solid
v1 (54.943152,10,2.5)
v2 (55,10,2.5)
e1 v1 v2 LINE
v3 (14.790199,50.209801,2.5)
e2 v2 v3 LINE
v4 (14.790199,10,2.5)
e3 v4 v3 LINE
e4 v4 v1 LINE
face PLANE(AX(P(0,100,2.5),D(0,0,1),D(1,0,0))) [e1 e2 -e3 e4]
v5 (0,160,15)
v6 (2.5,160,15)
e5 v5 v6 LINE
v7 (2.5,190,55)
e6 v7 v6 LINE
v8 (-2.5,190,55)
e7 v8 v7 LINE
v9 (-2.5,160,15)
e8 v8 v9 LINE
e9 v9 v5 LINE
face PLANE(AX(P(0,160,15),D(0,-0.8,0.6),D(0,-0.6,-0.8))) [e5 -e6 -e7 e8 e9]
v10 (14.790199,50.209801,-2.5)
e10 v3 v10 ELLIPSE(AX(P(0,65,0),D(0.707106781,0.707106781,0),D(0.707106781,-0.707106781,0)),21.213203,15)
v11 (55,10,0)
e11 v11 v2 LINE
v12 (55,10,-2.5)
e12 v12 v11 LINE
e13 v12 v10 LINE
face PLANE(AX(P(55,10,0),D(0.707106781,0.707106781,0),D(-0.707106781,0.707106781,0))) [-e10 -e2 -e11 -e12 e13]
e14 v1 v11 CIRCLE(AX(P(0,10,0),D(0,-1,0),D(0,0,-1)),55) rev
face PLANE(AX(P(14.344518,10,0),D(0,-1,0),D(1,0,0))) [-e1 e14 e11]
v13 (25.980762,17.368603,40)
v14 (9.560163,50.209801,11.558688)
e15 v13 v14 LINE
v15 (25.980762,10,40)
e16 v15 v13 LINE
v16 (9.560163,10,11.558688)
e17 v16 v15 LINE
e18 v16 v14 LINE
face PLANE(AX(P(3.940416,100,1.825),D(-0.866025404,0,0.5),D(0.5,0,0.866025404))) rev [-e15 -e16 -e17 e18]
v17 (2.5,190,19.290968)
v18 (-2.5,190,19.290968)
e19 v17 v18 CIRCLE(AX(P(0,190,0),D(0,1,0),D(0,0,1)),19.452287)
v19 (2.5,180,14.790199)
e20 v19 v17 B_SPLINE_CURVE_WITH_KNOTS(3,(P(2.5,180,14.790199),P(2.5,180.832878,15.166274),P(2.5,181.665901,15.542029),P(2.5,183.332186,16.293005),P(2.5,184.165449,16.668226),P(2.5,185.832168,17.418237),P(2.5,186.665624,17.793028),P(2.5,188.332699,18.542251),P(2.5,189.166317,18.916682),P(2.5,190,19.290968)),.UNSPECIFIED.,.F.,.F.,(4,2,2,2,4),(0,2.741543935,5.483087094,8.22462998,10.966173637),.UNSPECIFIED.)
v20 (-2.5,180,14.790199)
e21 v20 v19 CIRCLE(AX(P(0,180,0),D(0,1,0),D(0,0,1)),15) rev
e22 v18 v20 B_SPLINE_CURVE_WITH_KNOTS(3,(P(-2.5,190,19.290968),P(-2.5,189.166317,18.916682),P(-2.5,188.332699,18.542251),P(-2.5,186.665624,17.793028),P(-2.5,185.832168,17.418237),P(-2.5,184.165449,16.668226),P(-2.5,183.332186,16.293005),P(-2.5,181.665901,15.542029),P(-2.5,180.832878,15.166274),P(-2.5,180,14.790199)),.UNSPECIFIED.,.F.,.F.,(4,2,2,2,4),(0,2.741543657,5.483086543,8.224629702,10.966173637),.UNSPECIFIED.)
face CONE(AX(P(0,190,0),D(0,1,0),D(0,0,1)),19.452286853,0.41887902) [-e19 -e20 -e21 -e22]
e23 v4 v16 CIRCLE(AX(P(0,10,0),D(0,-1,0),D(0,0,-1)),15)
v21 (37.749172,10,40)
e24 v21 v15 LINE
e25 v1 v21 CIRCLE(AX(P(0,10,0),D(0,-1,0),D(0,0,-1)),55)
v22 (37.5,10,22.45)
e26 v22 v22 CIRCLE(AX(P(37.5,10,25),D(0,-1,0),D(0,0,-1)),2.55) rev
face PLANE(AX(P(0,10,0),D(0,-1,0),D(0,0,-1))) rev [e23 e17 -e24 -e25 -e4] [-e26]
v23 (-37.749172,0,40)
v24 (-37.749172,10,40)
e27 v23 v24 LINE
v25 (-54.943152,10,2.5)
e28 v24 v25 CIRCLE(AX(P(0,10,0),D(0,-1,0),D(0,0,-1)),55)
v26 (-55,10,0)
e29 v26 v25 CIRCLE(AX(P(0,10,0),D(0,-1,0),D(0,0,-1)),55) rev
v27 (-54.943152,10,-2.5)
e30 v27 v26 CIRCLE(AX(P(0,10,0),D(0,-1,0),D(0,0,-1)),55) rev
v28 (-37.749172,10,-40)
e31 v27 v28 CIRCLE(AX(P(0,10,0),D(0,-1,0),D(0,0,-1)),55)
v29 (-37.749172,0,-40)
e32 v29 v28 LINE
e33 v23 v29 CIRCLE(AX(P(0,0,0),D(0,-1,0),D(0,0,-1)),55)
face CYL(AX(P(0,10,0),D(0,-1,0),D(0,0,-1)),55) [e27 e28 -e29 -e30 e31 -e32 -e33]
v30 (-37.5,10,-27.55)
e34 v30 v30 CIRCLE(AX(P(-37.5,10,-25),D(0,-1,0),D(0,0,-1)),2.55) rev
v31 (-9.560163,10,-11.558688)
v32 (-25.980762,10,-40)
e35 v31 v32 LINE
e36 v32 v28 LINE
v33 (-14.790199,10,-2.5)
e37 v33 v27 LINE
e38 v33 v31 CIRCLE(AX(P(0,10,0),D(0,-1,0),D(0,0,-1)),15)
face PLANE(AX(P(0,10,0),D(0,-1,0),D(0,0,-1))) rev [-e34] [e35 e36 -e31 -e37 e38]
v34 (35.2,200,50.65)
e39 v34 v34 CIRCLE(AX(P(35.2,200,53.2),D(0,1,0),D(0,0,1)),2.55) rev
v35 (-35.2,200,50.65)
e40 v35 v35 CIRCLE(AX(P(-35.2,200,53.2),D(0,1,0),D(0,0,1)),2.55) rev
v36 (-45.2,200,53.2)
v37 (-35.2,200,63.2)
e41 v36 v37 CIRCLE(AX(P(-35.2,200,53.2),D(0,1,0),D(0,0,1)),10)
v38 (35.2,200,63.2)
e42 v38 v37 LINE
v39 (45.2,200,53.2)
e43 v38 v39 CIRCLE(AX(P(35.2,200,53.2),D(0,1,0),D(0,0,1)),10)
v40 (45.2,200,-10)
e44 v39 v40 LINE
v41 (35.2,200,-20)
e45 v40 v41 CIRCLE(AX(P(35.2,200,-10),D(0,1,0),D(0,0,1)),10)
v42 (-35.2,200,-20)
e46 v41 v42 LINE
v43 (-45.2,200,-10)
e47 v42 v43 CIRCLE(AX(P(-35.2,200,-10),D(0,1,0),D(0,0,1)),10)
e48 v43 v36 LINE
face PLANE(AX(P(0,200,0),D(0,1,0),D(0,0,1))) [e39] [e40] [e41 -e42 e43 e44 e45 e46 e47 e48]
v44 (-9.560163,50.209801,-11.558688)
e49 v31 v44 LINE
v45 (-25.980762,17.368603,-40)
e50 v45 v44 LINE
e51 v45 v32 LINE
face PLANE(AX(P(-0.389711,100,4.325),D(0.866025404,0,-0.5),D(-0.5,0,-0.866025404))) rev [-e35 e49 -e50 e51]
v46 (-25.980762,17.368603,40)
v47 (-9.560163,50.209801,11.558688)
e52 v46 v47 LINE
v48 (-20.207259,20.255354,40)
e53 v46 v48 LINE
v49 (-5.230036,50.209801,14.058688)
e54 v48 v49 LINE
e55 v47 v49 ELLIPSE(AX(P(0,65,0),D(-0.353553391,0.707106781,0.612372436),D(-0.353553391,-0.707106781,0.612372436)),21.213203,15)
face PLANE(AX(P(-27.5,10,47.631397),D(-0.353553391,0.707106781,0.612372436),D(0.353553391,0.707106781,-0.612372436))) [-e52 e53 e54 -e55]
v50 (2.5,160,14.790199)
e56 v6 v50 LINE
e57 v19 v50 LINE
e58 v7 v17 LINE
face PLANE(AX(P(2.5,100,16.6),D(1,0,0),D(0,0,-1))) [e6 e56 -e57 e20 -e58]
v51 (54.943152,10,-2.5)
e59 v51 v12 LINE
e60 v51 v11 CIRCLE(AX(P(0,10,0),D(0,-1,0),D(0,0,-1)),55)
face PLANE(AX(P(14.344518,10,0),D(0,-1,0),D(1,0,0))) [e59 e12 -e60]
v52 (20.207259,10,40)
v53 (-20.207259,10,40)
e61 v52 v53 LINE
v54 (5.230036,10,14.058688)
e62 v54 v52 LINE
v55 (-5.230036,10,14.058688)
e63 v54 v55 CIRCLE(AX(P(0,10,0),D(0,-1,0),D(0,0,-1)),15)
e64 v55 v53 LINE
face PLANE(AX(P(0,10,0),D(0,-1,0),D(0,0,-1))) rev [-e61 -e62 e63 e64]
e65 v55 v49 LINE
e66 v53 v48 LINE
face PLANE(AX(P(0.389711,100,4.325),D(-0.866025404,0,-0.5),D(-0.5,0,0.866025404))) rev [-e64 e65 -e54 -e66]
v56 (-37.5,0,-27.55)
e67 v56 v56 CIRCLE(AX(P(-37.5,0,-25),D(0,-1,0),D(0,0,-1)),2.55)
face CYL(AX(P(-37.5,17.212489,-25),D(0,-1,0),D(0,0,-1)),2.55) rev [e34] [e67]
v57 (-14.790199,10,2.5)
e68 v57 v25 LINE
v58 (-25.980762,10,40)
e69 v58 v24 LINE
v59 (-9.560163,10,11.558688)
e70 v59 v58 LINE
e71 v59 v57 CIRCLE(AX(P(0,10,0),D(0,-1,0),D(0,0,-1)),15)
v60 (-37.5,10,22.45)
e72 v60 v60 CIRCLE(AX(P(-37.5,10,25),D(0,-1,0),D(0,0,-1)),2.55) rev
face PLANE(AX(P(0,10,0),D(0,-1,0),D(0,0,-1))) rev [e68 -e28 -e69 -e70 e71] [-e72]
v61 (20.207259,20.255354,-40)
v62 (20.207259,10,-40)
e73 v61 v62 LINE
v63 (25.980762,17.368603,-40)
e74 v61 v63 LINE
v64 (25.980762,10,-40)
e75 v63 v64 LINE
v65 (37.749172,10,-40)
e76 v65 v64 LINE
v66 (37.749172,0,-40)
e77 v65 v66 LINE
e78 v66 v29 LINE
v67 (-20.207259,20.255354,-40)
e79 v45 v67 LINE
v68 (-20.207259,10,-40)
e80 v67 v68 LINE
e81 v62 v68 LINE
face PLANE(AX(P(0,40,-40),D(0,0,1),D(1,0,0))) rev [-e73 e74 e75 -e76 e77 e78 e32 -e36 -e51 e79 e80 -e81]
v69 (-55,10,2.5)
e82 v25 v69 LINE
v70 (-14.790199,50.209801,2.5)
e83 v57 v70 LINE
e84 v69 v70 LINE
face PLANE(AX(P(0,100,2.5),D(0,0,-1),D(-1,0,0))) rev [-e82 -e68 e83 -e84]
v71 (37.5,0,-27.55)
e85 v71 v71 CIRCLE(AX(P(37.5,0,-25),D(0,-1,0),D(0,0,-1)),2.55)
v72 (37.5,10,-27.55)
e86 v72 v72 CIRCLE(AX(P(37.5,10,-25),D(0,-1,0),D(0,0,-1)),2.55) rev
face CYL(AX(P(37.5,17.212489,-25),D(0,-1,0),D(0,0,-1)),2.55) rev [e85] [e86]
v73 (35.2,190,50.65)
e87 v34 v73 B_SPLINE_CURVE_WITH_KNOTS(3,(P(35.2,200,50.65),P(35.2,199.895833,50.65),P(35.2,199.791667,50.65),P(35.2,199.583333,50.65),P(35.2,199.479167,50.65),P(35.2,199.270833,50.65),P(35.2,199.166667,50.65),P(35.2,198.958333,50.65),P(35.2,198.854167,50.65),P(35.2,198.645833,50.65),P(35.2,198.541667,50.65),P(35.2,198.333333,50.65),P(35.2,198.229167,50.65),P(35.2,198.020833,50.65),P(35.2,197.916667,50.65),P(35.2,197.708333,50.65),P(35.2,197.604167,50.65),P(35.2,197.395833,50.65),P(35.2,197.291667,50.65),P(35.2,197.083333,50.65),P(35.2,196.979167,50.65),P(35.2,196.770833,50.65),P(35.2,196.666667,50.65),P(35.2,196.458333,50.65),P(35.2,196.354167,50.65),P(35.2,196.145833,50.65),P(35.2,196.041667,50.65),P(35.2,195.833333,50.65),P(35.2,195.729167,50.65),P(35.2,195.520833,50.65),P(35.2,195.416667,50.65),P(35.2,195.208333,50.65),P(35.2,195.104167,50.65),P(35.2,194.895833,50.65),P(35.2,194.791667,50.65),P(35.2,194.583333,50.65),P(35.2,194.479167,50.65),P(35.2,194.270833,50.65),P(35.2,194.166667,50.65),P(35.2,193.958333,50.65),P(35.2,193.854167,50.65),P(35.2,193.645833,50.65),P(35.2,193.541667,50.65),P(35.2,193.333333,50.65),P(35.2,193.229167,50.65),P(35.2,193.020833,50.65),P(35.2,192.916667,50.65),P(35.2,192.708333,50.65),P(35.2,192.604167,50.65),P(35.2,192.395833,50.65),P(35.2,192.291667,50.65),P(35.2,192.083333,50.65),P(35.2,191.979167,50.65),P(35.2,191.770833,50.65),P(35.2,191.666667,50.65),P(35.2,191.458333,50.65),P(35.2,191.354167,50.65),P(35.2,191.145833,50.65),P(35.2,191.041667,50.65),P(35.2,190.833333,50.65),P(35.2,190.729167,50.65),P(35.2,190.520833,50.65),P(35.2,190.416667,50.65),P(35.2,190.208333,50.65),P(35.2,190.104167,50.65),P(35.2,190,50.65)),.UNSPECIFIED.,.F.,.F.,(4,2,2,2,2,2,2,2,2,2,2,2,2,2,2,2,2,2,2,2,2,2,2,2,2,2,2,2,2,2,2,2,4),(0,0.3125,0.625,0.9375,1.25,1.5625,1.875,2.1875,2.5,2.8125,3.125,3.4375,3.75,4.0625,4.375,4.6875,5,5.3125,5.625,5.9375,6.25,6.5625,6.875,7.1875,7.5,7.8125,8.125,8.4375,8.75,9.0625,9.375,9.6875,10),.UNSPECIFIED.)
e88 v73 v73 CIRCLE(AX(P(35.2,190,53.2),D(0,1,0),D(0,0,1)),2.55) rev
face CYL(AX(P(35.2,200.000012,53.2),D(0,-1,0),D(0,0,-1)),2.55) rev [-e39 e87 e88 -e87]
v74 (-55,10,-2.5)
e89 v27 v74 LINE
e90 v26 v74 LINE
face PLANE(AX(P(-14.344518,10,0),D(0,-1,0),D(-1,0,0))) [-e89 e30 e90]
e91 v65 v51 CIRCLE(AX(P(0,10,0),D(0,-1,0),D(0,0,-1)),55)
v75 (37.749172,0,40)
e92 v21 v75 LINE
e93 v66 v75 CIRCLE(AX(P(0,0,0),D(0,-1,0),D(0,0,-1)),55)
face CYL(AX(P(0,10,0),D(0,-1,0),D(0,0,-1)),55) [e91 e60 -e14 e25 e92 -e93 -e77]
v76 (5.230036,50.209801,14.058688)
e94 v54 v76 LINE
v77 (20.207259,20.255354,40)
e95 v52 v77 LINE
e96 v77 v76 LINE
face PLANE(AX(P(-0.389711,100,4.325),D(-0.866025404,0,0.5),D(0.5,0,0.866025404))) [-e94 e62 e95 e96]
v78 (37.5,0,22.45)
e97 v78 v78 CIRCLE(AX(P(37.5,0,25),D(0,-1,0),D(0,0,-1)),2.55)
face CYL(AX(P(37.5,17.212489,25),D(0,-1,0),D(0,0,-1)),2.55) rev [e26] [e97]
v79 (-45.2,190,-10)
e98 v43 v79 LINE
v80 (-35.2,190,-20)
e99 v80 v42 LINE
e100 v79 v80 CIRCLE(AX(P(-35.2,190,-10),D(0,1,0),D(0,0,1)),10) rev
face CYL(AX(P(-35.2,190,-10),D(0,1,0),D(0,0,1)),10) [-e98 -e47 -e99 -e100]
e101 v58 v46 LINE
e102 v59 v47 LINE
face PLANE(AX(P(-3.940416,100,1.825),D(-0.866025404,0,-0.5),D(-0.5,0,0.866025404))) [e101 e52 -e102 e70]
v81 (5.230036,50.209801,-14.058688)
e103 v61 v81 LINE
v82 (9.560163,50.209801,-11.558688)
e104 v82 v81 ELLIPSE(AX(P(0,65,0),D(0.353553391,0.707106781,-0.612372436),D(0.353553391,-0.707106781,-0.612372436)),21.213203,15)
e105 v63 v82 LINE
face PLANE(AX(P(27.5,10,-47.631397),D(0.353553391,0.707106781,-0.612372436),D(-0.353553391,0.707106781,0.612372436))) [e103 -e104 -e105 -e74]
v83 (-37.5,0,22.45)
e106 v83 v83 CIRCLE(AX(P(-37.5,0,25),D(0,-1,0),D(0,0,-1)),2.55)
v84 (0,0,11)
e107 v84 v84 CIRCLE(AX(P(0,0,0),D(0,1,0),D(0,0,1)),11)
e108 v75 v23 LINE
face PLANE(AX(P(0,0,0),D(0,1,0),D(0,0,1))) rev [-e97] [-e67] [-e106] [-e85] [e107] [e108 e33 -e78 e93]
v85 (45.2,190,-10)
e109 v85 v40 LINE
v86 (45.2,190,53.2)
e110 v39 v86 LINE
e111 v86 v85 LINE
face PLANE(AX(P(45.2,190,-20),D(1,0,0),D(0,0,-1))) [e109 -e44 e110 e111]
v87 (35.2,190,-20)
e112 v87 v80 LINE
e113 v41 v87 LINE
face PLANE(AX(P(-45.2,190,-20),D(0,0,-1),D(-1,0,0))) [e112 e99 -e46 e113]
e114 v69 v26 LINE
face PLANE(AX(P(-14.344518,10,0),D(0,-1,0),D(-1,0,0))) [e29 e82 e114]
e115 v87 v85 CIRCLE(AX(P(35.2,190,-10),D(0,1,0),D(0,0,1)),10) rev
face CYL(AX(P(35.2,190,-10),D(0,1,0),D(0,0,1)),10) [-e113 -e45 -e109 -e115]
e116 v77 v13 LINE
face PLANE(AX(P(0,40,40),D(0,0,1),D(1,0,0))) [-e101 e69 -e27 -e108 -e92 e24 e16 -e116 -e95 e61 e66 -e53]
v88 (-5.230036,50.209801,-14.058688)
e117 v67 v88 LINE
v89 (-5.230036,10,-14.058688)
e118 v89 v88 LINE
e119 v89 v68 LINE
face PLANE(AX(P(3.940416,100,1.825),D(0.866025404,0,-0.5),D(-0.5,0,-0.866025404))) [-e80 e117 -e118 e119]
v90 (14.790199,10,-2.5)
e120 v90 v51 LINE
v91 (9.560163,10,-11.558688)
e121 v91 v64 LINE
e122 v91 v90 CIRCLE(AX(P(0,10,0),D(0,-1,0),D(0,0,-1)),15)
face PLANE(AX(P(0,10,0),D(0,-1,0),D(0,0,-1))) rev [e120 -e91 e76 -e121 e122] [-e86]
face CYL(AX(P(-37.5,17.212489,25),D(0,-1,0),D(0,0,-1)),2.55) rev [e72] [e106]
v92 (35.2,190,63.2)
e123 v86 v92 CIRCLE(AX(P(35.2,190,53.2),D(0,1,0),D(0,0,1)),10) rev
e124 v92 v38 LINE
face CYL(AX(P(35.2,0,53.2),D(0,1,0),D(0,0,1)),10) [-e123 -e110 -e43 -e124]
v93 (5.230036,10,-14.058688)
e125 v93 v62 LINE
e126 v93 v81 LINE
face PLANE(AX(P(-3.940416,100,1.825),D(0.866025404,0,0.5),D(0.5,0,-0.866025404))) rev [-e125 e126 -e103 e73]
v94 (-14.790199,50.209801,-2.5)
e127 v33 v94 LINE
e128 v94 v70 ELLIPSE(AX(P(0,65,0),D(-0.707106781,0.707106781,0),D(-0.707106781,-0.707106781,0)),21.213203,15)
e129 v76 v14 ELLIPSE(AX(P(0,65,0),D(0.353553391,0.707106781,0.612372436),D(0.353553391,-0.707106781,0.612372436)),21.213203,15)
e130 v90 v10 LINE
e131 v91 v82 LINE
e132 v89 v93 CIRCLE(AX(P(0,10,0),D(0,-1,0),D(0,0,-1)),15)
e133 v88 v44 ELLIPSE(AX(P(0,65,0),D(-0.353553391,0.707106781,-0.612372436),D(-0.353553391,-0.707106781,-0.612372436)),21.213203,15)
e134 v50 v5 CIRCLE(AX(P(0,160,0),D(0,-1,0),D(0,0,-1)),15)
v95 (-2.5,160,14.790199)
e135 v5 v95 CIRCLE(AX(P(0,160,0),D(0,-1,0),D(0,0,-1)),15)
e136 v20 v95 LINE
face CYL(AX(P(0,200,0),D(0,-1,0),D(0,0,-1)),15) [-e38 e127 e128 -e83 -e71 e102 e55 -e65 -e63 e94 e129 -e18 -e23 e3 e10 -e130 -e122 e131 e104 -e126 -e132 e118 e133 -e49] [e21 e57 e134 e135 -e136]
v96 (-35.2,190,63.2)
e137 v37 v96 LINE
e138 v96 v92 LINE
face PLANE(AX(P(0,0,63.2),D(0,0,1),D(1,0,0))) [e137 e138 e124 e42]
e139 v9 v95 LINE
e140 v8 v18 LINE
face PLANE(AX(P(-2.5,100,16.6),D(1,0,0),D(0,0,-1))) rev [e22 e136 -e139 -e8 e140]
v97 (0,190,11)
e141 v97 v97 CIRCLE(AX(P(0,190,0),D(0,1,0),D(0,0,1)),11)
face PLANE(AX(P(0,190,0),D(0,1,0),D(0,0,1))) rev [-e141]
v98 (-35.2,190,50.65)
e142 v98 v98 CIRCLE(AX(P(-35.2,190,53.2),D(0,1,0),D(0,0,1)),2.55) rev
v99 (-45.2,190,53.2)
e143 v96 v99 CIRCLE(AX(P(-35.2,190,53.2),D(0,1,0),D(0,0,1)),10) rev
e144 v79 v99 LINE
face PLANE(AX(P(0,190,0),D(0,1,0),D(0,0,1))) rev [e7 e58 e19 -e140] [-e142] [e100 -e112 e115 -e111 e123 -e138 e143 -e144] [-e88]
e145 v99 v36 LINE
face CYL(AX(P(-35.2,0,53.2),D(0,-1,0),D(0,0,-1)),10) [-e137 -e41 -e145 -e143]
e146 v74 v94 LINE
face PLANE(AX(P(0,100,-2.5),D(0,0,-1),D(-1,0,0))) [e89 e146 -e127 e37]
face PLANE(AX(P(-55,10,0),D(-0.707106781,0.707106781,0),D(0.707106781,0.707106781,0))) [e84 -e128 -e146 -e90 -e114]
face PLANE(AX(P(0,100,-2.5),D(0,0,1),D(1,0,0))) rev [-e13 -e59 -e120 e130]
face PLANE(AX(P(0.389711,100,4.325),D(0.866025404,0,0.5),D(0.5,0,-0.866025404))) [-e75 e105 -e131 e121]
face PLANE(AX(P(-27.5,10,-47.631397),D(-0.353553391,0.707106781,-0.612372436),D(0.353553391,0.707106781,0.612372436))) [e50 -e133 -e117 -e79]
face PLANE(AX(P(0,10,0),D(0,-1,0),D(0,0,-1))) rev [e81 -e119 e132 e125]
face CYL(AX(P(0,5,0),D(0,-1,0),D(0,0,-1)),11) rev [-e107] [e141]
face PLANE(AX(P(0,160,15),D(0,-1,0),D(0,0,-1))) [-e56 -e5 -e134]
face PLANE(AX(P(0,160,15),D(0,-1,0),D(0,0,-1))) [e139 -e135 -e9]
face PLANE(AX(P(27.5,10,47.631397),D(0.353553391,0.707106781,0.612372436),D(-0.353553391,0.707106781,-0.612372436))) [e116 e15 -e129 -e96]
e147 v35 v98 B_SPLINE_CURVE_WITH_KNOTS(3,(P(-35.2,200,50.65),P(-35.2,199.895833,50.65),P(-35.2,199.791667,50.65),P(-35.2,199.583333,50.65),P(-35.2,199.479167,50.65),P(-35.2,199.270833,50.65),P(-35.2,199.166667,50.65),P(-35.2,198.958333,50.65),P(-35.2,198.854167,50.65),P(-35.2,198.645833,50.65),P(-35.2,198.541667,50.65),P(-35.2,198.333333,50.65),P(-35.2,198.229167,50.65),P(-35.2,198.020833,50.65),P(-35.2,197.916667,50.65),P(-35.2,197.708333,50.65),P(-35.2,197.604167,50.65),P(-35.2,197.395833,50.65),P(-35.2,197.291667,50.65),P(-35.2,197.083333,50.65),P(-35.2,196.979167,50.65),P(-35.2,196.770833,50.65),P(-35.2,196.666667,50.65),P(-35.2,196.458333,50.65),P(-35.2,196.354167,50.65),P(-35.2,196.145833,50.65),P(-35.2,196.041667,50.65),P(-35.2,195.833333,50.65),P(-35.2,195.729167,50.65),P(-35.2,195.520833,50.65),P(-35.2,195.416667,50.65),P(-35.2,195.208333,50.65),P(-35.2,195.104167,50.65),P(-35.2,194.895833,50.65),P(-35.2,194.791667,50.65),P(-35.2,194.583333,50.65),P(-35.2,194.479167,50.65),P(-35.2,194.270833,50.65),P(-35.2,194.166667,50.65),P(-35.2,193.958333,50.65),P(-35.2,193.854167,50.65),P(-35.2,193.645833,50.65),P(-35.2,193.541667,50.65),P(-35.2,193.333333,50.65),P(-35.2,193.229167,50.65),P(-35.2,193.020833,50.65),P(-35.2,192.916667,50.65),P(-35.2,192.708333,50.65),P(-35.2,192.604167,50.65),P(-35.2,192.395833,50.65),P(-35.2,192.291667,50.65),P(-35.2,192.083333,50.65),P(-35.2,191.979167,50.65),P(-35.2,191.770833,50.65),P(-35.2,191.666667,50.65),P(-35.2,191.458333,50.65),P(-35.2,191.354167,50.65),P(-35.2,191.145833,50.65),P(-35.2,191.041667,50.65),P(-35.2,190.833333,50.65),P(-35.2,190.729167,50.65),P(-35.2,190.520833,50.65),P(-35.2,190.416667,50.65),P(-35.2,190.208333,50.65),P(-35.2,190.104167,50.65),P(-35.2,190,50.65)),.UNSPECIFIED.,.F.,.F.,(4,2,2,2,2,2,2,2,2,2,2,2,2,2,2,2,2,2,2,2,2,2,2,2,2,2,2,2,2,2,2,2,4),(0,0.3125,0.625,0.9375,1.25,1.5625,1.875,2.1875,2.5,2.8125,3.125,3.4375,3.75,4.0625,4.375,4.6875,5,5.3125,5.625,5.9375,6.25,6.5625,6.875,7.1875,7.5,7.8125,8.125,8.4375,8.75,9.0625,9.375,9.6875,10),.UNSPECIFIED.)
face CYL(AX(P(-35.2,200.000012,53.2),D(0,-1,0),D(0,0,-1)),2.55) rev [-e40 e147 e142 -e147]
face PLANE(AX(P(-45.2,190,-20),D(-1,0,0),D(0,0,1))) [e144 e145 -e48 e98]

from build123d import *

# Parameters (mm, degrees)
SKETCH1_R                      = 2.55
SKETCH1_R_2                    = 11
BASE_DEPTH                     = 5
SKETCH1_3_R                    = 15
SKETCH1_3_R_2                  = 11
STEM_DEPTH                     = 200
SKETCH4_W                      = 90.4
SKETCH4_H                      = 40
TOP_PLATE_DEPTH                = 10
SKETCH6_W                      = 90.4
SKETCH6_H                      = 10
EXTRA_BACK_DEPTH               = 43.2
RIB1_START                     = -2.5
RIB1_DEPTH                     = 5
CUT_EXTRUDE1_REACH             = 217.059
SKETCH10_R                     = 2.55
CUT_EXTRUDE1_DIRECTION_2_DEPTH = 216.0592709
FILLET1_R                      = 10
FILLET2_R                      = 10
SKETCH11_R                     = 55
NEW_BASE_DEPTH                 = 10
RIB2_START                     = -2.5
RIB2_DEPTH                     = 5
CIRPATTERN7_COUNT              = 6
SKETCH13_R                     = 2.55
CUT_EXTRUDE2_DEPTH             = 10
FILLET3_R                      = 10
SKETCH15_R                     = 11
REMOVE_CENTER_DEPTH            = 208.65172766
BASE_CUT_DEPTH                 = 40
CHAMFER2_SIZE                  = 10
CHAMFER2_SIZE2                 = 4.452286853


with BuildPart() as part:
    # Sketch1 → base (new body)
    with BuildSketch(Plane(origin=(0, 0, 0), x_dir=(1, 0, 0), z_dir=(0, 1, 0))):
        with BuildLine():
            Line((-16, 25.377155081), (-42.833333333, 8.459051694))
            ThreePointArc((-42.833333333, 8.459051694), (-47.5, 0), (-42.833333333, -8.459051694))
            Line((-42.833333333, -8.459051694), (-16, -25.377155081))
            ThreePointArc((-16, -25.377155081), (0, -30), (16, -25.377155081))
            Line((16, -25.377155081), (42.833333333, -8.459051694))
            ThreePointArc((42.833333333, -8.459051694), (47.5, 0), (42.833333333, 8.459051694))
            Line((42.833333333, 8.459051694), (16, 25.377155081))
            ThreePointArc((16, 25.377155081), (0, 30), (-16, 25.377155081))
        make_face()
        with Locations(Location((-37.5, 0, 0), (0, 0, 270))):
            Circle(SKETCH1_R, mode=Mode.SUBTRACT)
        with Locations(Location((37.5, 0, 0), (0, 0, 270))):
            Circle(SKETCH1_R, mode=Mode.SUBTRACT)
        with Locations(Location((0, 0, 0), (0, 0, 270))):
            Circle(SKETCH1_R_2, mode=Mode.SUBTRACT)
    extrude(amount=BASE_DEPTH)

    # Sketch1<3> → stem (add)
    with BuildSketch(Plane(origin=(0, 0, 0), x_dir=(1, 0, 0), z_dir=(0, 1, 0))):
        with Locations(Location((0, 0, 0), (0, 0, 270))):
            Circle(SKETCH1_3_R)
        with Locations(Location((0, 0, 0), (0, 0, 270))):
            Circle(SKETCH1_3_R_2, mode=Mode.SUBTRACT)
    extrude(amount=STEM_DEPTH)

    # Sketch4 → top plate (add)
    with BuildSketch(Plane(origin=(0, 200, 0), x_dir=(1, 0, 0), z_dir=(0, 1, 0))):
        Rectangle(SKETCH4_W, SKETCH4_H)
    extrude(amount=-TOP_PLATE_DEPTH)

    # Sketch6 → extra back (add)
    with BuildSketch(Plane.XY.offset(20)):
        with Locations((0, 195)):
            Rectangle(SKETCH6_W, SKETCH6_H)
    extrude(amount=EXTRA_BACK_DEPTH)

    # Rib1: read off the stored shape, not the designer's step
    # Rib1 outline → Rib1 (add)
    with BuildSketch(Plane(origin=(0, 0, 0), x_dir=(0, 0, -1), z_dir=(1, 0, 0)).offset(RIB1_START)):
        Polygon((-15, 160), (-14.790199458, 160), (-14.790199458, 190), (-55, 190), align=None)
    extrude(amount=RIB1_DEPTH)

    # Sketch10 → Cut-Extrude1 (cut, up to next)
    with BuildSketch(Plane(origin=(0, 200, 0), x_dir=(1, 0, 0), z_dir=(0, 1, 0)), mode=Mode.PRIVATE) as cut_extrude1_sk1:
        with Locations(Location((35.2, -53.2, 0), (0, 0, 90))):
            Circle(SKETCH10_R)
    cut_extrude1_tool1 = extrude(cut_extrude1_sk1.sketch, amount=-CUT_EXTRUDE1_REACH, mode=Mode.PRIVATE) & part.part
    # Sketch10 → Cut-Extrude1 (cut, up to next)
    with BuildSketch(Plane(origin=(0, 200, 0), x_dir=(1, 0, 0), z_dir=(0, 1, 0)), mode=Mode.PRIVATE) as cut_extrude1_sk2:
        with Locations(Location((-35.2, -53.2, 0), (0, 0, 90))):
            Circle(SKETCH10_R)
    cut_extrude1_tool2 = extrude(cut_extrude1_sk2.sketch, amount=-CUT_EXTRUDE1_REACH, mode=Mode.PRIVATE) & part.part
    add(cut_extrude1_tool1.solids().sort_by_distance((35.2, 200, 53.2))[0], mode=Mode.SUBTRACT)
    add(cut_extrude1_tool2.solids().sort_by_distance((-35.2, 200, 53.2))[0], mode=Mode.SUBTRACT)

    # Sketch10 → Cut-Extrude1 direction 2 (cut)
    with BuildSketch(Plane(origin=(0, 200, 0), x_dir=(1, 0, 0), z_dir=(0, 1, 0))):
        with Locations(Location((35.2, -53.2, 0), (0, 0, 90))):
            Circle(SKETCH10_R)
        with Locations(Location((-35.2, -53.2, 0), (0, 0, 90))):
            Circle(SKETCH10_R)
    extrude(amount=CUT_EXTRUDE1_DIRECTION_2_DEPTH, mode=Mode.SUBTRACT)

    # Fillet1
    fillet1_edges = [part.edges().sort_by_distance(p)[0] for p in [
        (-45.2, 195, 63.2),
    ]]
    fillet(fillet1_edges, radius=FILLET1_R)

    # Fillet2
    fillet2_edges = [part.edges().sort_by_distance(p)[0] for p in [
        (45.2, 195, 63.2),
    ]]
    fillet(fillet2_edges, radius=FILLET2_R)

    # Sketch11 → new base (add)
    with BuildSketch(Plane.XZ):
        with Locations(Location((0, 0, 0), (0, 0, 270))):
            Circle(SKETCH11_R)
    extrude(amount=-NEW_BASE_DEPTH)

    # Rib2: read off the stored shape, not the designer's step
    # Rib2 outline → Rib2 (add)
    with BuildSketch(Plane.XY.offset(RIB2_START)):
        Polygon((13, 10), (55, 10), (13, 52), align=None)
    rib2 = extrude(amount=RIB2_DEPTH)

    # CirPattern7: Rib2 ×6 about axis
    cirpattern7_axis = Axis((0, 0, 0), (0, 1, 0))
    for i in range(1, CIRPATTERN7_COUNT):
        add(rib2.rotate(cirpattern7_axis, i * 360 / CIRPATTERN7_COUNT))

    # Sketch13 → Cut-Extrude2 (cut)
    with BuildSketch(Plane.XZ):
        with Locations(Location((-37.5, -25, 0), (0, 0, 270))):
            Circle(SKETCH13_R)
        with Locations(Location((-37.5, 25, 0), (0, 0, 270))):
            Circle(SKETCH13_R)
        with Locations(Location((37.5, 25, 0), (0, 0, 270))):
            Circle(SKETCH13_R)
        with Locations(Location((37.5, -25, 0), (0, 0, 270))):
            Circle(SKETCH13_R)
    extrude(amount=-CUT_EXTRUDE2_DEPTH, mode=Mode.SUBTRACT)

    # Fillet3
    fillet3_edges = [part.edges().sort_by_distance(p)[0] for p in [
        (45.2, 195, -20),
        (-45.2, 195, -20),
    ]]
    fillet(fillet3_edges, radius=FILLET3_R)

    # Sketch15 → remove center (cut, through all)
    with BuildSketch(Plane(origin=(0, 10, 0), x_dir=(1, 0, 0), z_dir=(0, 1, 0))):
        with Locations(Location((0, 0, 0), (0, 0, 270))):
            Circle(SKETCH15_R)
    extrude(amount=-REMOVE_CENTER_DEPTH, mode=Mode.SUBTRACT)

    # Sketch16 → base cut (cut)
    with BuildSketch(Plane.XZ):
        with BuildLine():
            Line((-37.749172176, 40), (37.749172176, 40))
            ThreePointArc((37.749172176, 40), (0, 55), (-37.749172176, 40))
        make_face()
        with BuildLine():
            ThreePointArc((-37.749172176, -40), (0, -55), (37.749172176, -40))
            Line((37.749172176, -40), (-37.749172176, -40))
        make_face()
    extrude(amount=-BASE_CUT_DEPTH, mode=Mode.SUBTRACT)


with BuildPart() as base_cut_kept_piece:
    # of the separate pieces the step leaves, the one the design keeps (base_cut_pieces_kept)
    add(part.part.solids().sort_by_distance((45.2, 190, -10))[0])

    # Chamfer2
    chamfer2_edges = [base_cut_kept_piece.edges().sort_by_distance(p)[0] for p in [
        (0, 190, -15),
    ]]
    chamfer2_side = [base_cut_kept_piece.faces().sort_by_distance(p)[0] for p in [
        (0, 100, -15),
    ]]
    chamfer(chamfer2_edges, length=CHAMFER2_SIZE, length2=CHAMFER2_SIZE2, reference=chamfer2_side[0])


solid = base_cut_kept_piece.part
